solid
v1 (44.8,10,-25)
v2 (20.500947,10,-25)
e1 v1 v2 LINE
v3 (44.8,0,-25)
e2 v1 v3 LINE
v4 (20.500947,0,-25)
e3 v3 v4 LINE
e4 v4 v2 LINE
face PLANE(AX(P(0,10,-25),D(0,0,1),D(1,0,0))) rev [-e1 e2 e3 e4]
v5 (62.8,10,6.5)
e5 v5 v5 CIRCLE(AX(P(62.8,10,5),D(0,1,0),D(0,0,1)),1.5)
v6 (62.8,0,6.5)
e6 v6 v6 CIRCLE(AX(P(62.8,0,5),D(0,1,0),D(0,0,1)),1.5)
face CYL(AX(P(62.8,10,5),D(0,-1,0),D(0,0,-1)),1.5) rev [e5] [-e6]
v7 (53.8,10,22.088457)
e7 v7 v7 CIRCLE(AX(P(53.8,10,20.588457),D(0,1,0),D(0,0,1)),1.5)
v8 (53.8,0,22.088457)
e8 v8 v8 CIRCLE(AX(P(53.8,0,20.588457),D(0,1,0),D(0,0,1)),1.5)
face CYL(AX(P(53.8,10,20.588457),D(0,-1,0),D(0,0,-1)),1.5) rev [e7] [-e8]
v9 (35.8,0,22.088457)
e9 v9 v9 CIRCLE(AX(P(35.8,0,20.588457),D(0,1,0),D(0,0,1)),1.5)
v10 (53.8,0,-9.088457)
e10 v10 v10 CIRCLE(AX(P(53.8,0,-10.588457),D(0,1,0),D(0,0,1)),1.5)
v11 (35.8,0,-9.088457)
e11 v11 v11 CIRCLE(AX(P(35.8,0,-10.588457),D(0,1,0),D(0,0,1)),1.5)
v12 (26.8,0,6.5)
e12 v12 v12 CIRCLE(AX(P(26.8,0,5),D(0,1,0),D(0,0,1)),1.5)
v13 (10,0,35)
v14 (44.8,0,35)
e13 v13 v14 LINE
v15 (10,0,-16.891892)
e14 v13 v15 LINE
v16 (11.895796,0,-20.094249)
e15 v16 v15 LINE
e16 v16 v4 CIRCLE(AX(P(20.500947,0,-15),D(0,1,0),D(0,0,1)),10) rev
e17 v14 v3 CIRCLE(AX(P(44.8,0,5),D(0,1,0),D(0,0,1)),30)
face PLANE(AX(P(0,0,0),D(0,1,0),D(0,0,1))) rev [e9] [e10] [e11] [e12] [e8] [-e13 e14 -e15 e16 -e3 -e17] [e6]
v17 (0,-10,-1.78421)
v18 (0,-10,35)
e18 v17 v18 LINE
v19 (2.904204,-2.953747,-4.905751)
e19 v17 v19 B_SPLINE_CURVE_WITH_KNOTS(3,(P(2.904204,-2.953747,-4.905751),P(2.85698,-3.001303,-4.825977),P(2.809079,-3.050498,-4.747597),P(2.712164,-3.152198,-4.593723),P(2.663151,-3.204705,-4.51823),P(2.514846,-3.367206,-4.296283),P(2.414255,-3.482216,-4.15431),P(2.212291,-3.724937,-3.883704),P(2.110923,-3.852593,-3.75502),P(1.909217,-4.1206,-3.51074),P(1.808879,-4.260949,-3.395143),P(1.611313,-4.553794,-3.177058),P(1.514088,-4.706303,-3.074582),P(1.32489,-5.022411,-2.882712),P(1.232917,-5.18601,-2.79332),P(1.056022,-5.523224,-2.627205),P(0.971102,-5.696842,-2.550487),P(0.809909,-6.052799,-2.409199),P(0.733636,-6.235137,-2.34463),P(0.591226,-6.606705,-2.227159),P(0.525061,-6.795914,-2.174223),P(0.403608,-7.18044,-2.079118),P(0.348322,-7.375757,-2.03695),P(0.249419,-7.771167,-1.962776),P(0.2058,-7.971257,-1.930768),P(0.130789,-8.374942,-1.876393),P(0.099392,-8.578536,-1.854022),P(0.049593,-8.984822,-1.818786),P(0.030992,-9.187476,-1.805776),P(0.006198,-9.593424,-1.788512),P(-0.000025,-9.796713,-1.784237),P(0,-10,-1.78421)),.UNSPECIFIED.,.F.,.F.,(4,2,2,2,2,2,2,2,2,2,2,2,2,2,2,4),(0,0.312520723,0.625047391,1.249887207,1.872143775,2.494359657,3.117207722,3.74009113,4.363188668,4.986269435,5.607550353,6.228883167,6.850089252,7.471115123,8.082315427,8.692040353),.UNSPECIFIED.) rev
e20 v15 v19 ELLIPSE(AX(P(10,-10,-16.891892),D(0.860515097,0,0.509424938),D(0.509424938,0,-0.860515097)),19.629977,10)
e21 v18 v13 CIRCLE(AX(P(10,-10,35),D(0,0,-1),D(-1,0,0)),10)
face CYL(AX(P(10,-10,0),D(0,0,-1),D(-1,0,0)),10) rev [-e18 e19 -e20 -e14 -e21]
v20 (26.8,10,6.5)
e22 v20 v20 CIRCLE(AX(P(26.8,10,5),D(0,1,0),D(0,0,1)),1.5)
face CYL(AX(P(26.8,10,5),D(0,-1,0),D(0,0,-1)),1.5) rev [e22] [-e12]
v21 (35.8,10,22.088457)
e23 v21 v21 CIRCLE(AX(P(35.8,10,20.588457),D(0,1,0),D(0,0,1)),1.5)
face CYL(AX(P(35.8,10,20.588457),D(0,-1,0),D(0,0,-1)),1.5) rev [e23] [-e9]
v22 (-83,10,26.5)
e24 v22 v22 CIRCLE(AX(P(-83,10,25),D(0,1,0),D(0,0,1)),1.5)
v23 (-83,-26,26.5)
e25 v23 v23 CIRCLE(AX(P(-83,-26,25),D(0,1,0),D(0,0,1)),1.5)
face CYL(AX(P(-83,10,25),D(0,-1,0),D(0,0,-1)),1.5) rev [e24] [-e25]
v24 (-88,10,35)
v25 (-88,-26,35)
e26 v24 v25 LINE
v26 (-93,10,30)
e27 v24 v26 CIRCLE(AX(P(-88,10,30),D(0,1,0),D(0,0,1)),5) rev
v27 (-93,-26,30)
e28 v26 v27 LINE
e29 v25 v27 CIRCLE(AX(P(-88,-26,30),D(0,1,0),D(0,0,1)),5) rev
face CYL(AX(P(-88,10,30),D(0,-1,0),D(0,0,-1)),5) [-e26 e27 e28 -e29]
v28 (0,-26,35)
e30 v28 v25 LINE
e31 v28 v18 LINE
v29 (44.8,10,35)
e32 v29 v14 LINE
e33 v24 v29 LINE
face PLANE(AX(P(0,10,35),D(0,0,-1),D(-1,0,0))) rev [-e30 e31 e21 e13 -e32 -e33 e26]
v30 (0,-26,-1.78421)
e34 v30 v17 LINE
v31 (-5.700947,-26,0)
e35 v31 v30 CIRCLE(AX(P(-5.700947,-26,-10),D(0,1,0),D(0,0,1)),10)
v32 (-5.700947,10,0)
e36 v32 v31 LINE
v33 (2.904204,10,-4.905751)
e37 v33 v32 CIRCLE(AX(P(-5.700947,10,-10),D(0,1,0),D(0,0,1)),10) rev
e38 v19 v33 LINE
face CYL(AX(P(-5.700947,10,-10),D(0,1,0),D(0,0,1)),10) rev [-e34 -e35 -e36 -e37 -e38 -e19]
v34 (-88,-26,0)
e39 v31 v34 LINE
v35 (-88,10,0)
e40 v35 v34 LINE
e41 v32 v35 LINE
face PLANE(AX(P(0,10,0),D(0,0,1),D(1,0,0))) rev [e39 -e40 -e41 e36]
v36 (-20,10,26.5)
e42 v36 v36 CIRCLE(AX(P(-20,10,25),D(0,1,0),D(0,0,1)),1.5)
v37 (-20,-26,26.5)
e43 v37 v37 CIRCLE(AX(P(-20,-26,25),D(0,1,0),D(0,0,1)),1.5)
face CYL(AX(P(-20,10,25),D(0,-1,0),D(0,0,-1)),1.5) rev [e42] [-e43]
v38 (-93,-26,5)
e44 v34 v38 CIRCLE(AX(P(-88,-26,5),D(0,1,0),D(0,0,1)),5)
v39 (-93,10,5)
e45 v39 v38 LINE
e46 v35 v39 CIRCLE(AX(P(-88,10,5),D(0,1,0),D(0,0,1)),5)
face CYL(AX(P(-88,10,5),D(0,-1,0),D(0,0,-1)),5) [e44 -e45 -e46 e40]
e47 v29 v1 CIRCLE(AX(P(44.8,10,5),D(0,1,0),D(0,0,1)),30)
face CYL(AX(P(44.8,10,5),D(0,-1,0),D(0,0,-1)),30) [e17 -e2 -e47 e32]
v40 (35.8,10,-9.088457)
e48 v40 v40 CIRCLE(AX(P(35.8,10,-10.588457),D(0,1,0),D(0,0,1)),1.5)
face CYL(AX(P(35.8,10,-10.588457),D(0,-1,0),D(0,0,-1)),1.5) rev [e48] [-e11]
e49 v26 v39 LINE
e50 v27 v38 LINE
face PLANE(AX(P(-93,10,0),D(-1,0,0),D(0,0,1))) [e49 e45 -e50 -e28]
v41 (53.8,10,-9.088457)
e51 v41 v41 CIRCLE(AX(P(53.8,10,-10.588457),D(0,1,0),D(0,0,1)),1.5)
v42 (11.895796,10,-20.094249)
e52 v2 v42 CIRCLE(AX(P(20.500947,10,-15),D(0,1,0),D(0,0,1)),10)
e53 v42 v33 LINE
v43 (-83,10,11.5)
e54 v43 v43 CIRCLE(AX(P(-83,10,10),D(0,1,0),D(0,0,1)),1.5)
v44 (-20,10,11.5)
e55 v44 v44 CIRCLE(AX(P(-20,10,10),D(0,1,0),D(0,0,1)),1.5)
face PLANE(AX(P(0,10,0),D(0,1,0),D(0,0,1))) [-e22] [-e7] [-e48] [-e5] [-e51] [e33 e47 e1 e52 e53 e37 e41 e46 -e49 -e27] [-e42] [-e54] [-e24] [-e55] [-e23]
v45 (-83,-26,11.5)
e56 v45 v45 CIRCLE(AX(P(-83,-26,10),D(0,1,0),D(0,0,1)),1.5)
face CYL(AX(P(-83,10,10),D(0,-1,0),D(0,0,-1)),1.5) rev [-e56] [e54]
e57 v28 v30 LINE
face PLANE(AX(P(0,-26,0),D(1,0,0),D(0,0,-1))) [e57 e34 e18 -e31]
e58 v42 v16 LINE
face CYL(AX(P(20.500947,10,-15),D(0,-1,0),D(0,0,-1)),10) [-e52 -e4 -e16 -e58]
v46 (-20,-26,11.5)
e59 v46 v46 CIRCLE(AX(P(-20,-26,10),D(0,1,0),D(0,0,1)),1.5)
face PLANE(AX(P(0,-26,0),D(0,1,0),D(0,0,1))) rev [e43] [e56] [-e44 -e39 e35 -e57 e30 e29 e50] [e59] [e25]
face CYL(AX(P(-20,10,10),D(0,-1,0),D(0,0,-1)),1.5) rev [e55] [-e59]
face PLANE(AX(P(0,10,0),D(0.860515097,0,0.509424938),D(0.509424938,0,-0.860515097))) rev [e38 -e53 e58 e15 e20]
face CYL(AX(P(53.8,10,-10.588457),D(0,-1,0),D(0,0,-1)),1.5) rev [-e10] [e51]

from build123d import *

# Parameters (mm, degrees)
SKETCH1_R           = 1.5
BOSS_EXTRUDE2_DEPTH = 10
BOSS_EXTRUDE3_START = -26
SKETCH1_3_R         = 1.5
BOSS_EXTRUDE3_DEPTH = 26
FILLET1_R           = 10


with BuildPart() as part:
    # Sketch1 → Boss-Extrude2 (new body)
    # profile 1 of 2: a face of its own
    with BuildSketch(Plane(origin=(0, 0, 0), x_dir=(-1, 0, 0), z_dir=(0, 1, 0))):
        with BuildLine():
            Line((0, 35), (-44.8, 35))
            ThreePointArc((-44.8, 35), (-74.8, 5), (-44.8, -25))
            Line((-44.8, -25), (-14.8, -25))
            Line((-14.8, -25), (0, 0))
            Line((0, 0), (0, 35))
        make_face()
        with Locations(Location((-53.8, -10.588457268, 0), (0, 0, 90))):
            Circle(SKETCH1_R, mode=Mode.SUBTRACT)
        with Locations(Location((-35.8, -10.588457268, 0), (0, 0, 90))):
            Circle(SKETCH1_R, mode=Mode.SUBTRACT)
        with Locations(Location((-26.8, 5, 0), (0, 0, 90))):
            Circle(SKETCH1_R, mode=Mode.SUBTRACT)
        with Locations(Location((-35.8, 20.588457268, 0), (0, 0, 90))):
            Circle(SKETCH1_R, mode=Mode.SUBTRACT)
        with Locations(Location((-53.8, 20.588457268, 0), (0, 0, 90))):
            Circle(SKETCH1_R, mode=Mode.SUBTRACT)
        with Locations(Location((-62.8, 5, 0), (0, 0, 90))):
            Circle(SKETCH1_R, mode=Mode.SUBTRACT)
    # profile 2 of 2: a face of its own
    with BuildSketch(Plane(origin=(0, 0, 0), x_dir=(-1, 0, 0), z_dir=(0, 1, 0))):
        with BuildLine():
            ThreePointArc((88, 35), (91.535533906, 33.535533906), (93, 30))
            Line((93, 30), (93, 5))
            ThreePointArc((93, 5), (91.535533906, 1.464466094), (88, 0))
            Line((88, 0), (0, 0))
            Line((0, 0), (0, 35))
            Line((0, 35), (88, 35))
        make_face()
        with Locations(Location((20, 10, 0), (0, 0, 90))):
            Circle(SKETCH1_R, mode=Mode.SUBTRACT)
        with Locations(Location((83, 10, 0), (0, 0, 90))):
            Circle(SKETCH1_R, mode=Mode.SUBTRACT)
        with Locations(Location((83, 25, 0), (0, 0, 90))):
            Circle(SKETCH1_R, mode=Mode.SUBTRACT)
        with Locations(Location((20, 25, 0), (0, 0, 90))):
            Circle(SKETCH1_R, mode=Mode.SUBTRACT)
    extrude(amount=BOSS_EXTRUDE2_DEPTH)

    # Sketch1<3> → Boss-Extrude3 (add)
    with BuildSketch(Plane(origin=(0, 0, 0), x_dir=(-1, 0, 0), z_dir=(0, 1, 0)).offset(BOSS_EXTRUDE3_START)):
        with BuildLine():
            ThreePointArc((88, 35), (91.535533906, 33.535533906), (93, 30))
            Line((93, 30), (93, 5))
            ThreePointArc((93, 5), (91.535533906, 1.464466094), (88, 0))
            Line((88, 0), (0, 0))
            Line((0, 0), (0, 35))
            Line((0, 35), (88, 35))
        make_face()
        with Locations(Location((20, 10, 0), (0, 0, 90))):
            Circle(SKETCH1_3_R, mode=Mode.SUBTRACT)
        with Locations(Location((83, 10, 0), (0, 0, 90))):
            Circle(SKETCH1_3_R, mode=Mode.SUBTRACT)
        with Locations(Location((83, 25, 0), (0, 0, 90))):
            Circle(SKETCH1_3_R, mode=Mode.SUBTRACT)
        with Locations(Location((20, 25, 0), (0, 0, 90))):
            Circle(SKETCH1_3_R, mode=Mode.SUBTRACT)
    extrude(amount=BOSS_EXTRUDE3_DEPTH)

    # Fillet1
    # the kernel refuses this fillet: 10 mm, written as the material it adds along each edge
    with BuildSketch(Plane(origin=(0, 0, -60), x_dir=(0, -1, 0), z_dir=(0, 0, 1))) as fillet1_piece_1_section:
        with BuildLine():
            CenterArc((FILLET1_R, FILLET1_R), FILLET1_R, 180, 90)
            Line((0, FILLET1_R), (-FILLET1_R * 0.02, FILLET1_R))
            Line((-FILLET1_R * 0.02, FILLET1_R), (-FILLET1_R * 0.02, -FILLET1_R * 0.02))
            Line((-FILLET1_R * 0.02, -FILLET1_R * 0.02), (FILLET1_R, -FILLET1_R * 0.02))
            Line((FILLET1_R, -FILLET1_R * 0.02), (FILLET1_R, 0))
        make_face()
    fillet1_piece_1 = extrude(amount=95, mode=Mode.PRIVATE)
    fillet1_piece_1 = split(fillet1_piece_1, bisect_by=Plane(origin=(4.301180518, -1.064725153, 0), z_dir=(0, 0, -1)), keep=Keep.TOP, mode=Mode.PRIVATE)
    fillet1_piece_1 = split(fillet1_piece_1, bisect_by=Plane(origin=(2.708698038, -1.064725153, -4.575503443), z_dir=(0.8605150974154716, 0, 0.509424937669959)), keep=Keep.TOP, mode=Mode.PRIVATE)
    add(fillet1_piece_1)
    with BuildSketch(Plane(origin=(0, 0, 0), x_dir=(0, -1, 0), z_dir=(0, 0, 1))) as fillet1_piece_2_section:
        with BuildLine():
            CenterArc((FILLET1_R, FILLET1_R), FILLET1_R, 180, 90)
            Line((0, FILLET1_R), (-FILLET1_R * 0.02, FILLET1_R))
            Line((-FILLET1_R * 0.02, FILLET1_R), (-FILLET1_R * 0.02, -FILLET1_R * 0.02))
            Line((-FILLET1_R * 0.02, -FILLET1_R * 0.02), (FILLET1_R, -FILLET1_R * 0.02))
            Line((FILLET1_R, -FILLET1_R * 0.02), (FILLET1_R, 0))
        make_face()
    fillet1_piece_2 = extrude(amount=35, mode=Mode.PRIVATE)
    fillet1_piece_2 = split(fillet1_piece_2, bisect_by=Plane(origin=(-7.086614588, -2.262932977, 11.97063275), z_dir=(0.8605150974154716, 0, 0.509424937669959)), keep=Keep.TOP, mode=Mode.PRIVATE)
    add(fillet1_piece_2)
    with BuildSketch(Plane(origin=(0, 0, 0), x_dir=(0, -1, 0), z_dir=(0, 0, 1))) as fillet1_piece_3_section:
        with BuildLine():
            CenterArc((FILLET1_R, FILLET1_R), FILLET1_R, 180, 90)
            Line((0, FILLET1_R), (-FILLET1_R * 0.02, FILLET1_R))
            Line((-FILLET1_R * 0.02, FILLET1_R), (-FILLET1_R * 0.02, -FILLET1_R * 0.02))
            Line((-FILLET1_R * 0.02, -FILLET1_R * 0.02), (FILLET1_R, -FILLET1_R * 0.02))
            Line((FILLET1_R, -FILLET1_R * 0.02), (FILLET1_R, 0))
        make_face()
    fillet1_piece_3 = extrude(amount=35, mode=Mode.PRIVATE)
    fillet1_piece_3 = split(fillet1_piece_3, bisect_by=Plane(origin=(-0.083967584, -4.9, 0.141837136), z_dir=(-0.8605150974154716, 0, -0.509424937669959)), keep=Keep.TOP, mode=Mode.PRIVATE)
    add(fillet1_piece_3)
    with BuildSketch(Plane(origin=(0, -34.205679631, 0), x_dir=(-1, 0, 0), z_dir=(0, 1, 0))) as fillet1_piece_4_section:
        with BuildLine():
            CenterArc((FILLET1_R * 0.570094660516, -FILLET1_R), FILLET1_R, 90, 59.374467281)
            Line((-FILLET1_R * 0.290420436899, -FILLET1_R * 0.49057506233), (-FILLET1_R * 0.307630738848, -FILLET1_R * 0.480386563577))
            Line((-FILLET1_R * 0.307630738848, -FILLET1_R * 0.480386563577), (-FILLET1_R * 0.0114018932103, FILLET1_R * 0.02))
            Line((-FILLET1_R * 0.0114018932103, FILLET1_R * 0.02), (FILLET1_R * 0.570094660516, FILLET1_R * 0.02))
            Line((FILLET1_R * 0.570094660516, FILLET1_R * 0.02), (FILLET1_R * 0.570094660516, 0))
        make_face()
    fillet1_piece_4 = extrude(amount=44.205679631, mode=Mode.PRIVATE)
    fillet1_piece_4 = split(fillet1_piece_4, bisect_by=Plane(origin=(0, -13, -0.363733484), z_dir=(-1, 0, 0)), keep=Keep.TOP, mode=Mode.PRIVATE)
    fillet1_piece_4 = split(fillet1_piece_4, bisect_by=Plane(origin=(-1.77482193, -26, -0.363733484), z_dir=(0, 1, 0)), keep=Keep.TOP, mode=Mode.PRIVATE)
    fillet1_piece_4 = split(fillet1_piece_4, bisect_by=Plane(origin=(-1.77482193, 0, -0.363733484), z_dir=(0, -1, 0)), keep=Keep.TOP, mode=Mode.PRIVATE)
    add(fillet1_piece_4)
    with BuildSketch(Plane(origin=(0, 0, 0), x_dir=(-1, 0, 0), z_dir=(0, 1, 0))) as fillet1_piece_5_section:
        with BuildLine():
            CenterArc((FILLET1_R * 0.570094660516, -FILLET1_R), FILLET1_R, 90, 59.374467281)
            Line((-FILLET1_R * 0.290420436899, -FILLET1_R * 0.49057506233), (-FILLET1_R * 0.307630738848, -FILLET1_R * 0.480386563577))
            Line((-FILLET1_R * 0.307630738848, -FILLET1_R * 0.480386563577), (-FILLET1_R * 0.0114018932103, FILLET1_R * 0.02))
            Line((-FILLET1_R * 0.0114018932103, FILLET1_R * 0.02), (FILLET1_R * 0.570094660516, FILLET1_R * 0.02))
            Line((FILLET1_R * 0.570094660516, FILLET1_R * 0.02), (FILLET1_R * 0.570094660516, 0))
        make_face()
    fillet1_piece_5 = extrude(amount=10, mode=Mode.PRIVATE)
    fillet1_piece_5 = split(fillet1_piece_5, bisect_by=Plane(origin=(0, 5, -0.363733484), z_dir=(-1, 0, 0)), keep=Keep.TOP, mode=Mode.PRIVATE)
    add(fillet1_piece_5)
    with BuildSketch(Plane(origin=(0, 0, 0), x_dir=(-1, 0, 0), z_dir=(0, 1, 0))) as fillet1_piece_6_section:
        with BuildLine():
            CenterArc((FILLET1_R * 0.570094660516, -FILLET1_R), FILLET1_R, 90, 59.374467281)
            Line((-FILLET1_R * 0.290420436899, -FILLET1_R * 0.49057506233), (-FILLET1_R * 0.307630738848, -FILLET1_R * 0.480386563577))
            Line((-FILLET1_R * 0.307630738848, -FILLET1_R * 0.480386563577), (-FILLET1_R * 0.0114018932103, FILLET1_R * 0.02))
            Line((-FILLET1_R * 0.0114018932103, FILLET1_R * 0.02), (FILLET1_R * 0.570094660516, FILLET1_R * 0.02))
            Line((FILLET1_R * 0.570094660516, FILLET1_R * 0.02), (FILLET1_R * 0.570094660516, 0))
        make_face()
    fillet1_piece_6 = extrude(amount=10, mode=Mode.PRIVATE)
    fillet1_piece_6 = split(fillet1_piece_6, bisect_by=Plane(origin=(0, 5, -2.053594733), z_dir=(1, 0, 0)), keep=Keep.TOP, mode=Mode.PRIVATE)
    add(fillet1_piece_6)
    with BuildSketch(Plane(origin=(0, -34.205679631, 0), x_dir=(-1, 0, 0), z_dir=(0, 1, 0))) as fillet1_piece_7a_section:
        with BuildLine():
            CenterArc((FILLET1_R * 0.570094660516, -FILLET1_R), FILLET1_R, 90, 59.374467281)
            Line((-FILLET1_R * 0.290420436899, -FILLET1_R * 0.49057506233), (-FILLET1_R * 0.307630738848, -FILLET1_R * 0.480386563577))
            Line((-FILLET1_R * 0.307630738848, -FILLET1_R * 0.480386563577), (-FILLET1_R * 0.0114018932103, FILLET1_R * 0.02))
            Line((-FILLET1_R * 0.0114018932103, FILLET1_R * 0.02), (FILLET1_R * 0.570094660516, FILLET1_R * 0.02))
            Line((FILLET1_R * 0.570094660516, FILLET1_R * 0.02), (FILLET1_R * 0.570094660516, 0))
        make_face()
    fillet1_piece_7a = extrude(amount=44.205679631, mode=Mode.PRIVATE)
    fillet1_piece_7a = split(fillet1_piece_7a, bisect_by=Plane(origin=(0, -13, -2.053594733), z_dir=(1, 0, 0)), keep=Keep.TOP, mode=Mode.PRIVATE)
    fillet1_piece_7a = split(fillet1_piece_7a, bisect_by=Plane(origin=(1.054652956, -26, -2.053594733), z_dir=(0, 1, 0)), keep=Keep.TOP, mode=Mode.PRIVATE)
    fillet1_piece_7a = split(fillet1_piece_7a, bisect_by=Plane(origin=(1.054652956, 0, -2.053594733), z_dir=(0, -1, 0)), keep=Keep.TOP, mode=Mode.PRIVATE)
    with BuildSketch(Plane(origin=(0, 0, -60), x_dir=(0, -1, 0), z_dir=(0, 0, 1))) as fillet1_piece_7b_section:
        with BuildLine():
            CenterArc((FILLET1_R, FILLET1_R), FILLET1_R, 180, 90)
            Line((0, FILLET1_R), (-FILLET1_R * 0.02, FILLET1_R))
            Line((-FILLET1_R * 0.02, FILLET1_R), (-FILLET1_R * 0.02, -FILLET1_R * 0.02))
            Line((-FILLET1_R * 0.02, -FILLET1_R * 0.02), (FILLET1_R, -FILLET1_R * 0.02))
            Line((FILLET1_R, -FILLET1_R * 0.02), (FILLET1_R, 0))
        make_face()
    fillet1_piece_7b = extrude(amount=95, mode=Mode.PRIVATE)
    fillet1_piece_7b = split(fillet1_piece_7b, bisect_by=Plane(origin=(2.124740403, -2.345898291, 0), z_dir=(0, 0, -1)), keep=Keep.TOP, mode=Mode.PRIVATE)
    fillet1_piece_7b = split(fillet1_piece_7b, bisect_by=Plane(origin=(14.492269712, -2.345898291, -24.480185325), z_dir=(-0.8605150974154716, 0, -0.509424937669959)), keep=Keep.TOP, mode=Mode.PRIVATE)
    fillet1_piece_7 = fillet1_piece_7a & fillet1_piece_7b
    add(fillet1_piece_7)
    # the kernel refuses this fillet: 10 mm, written as the material it takes off along each edge
    with BuildSketch(Plane(origin=(14.8, -34.205679631, -25), x_dir=(-0.5094249376699589, 0, 0.8605150974154715), z_dir=(0, 1, 0))) as fillet1_2_piece_1:
        with BuildLine():
            CenterArc((FILLET1_R * 0.570094660516, FILLET1_R), FILLET1_R, 210.625532719, 59.374467281)
            Line((-FILLET1_R * 0.290420436899, FILLET1_R * 0.49057506233), (-FILLET1_R * 0.307630738848, FILLET1_R * 0.480386563577))
            Line((-FILLET1_R * 0.307630738848, FILLET1_R * 0.480386563577), (-FILLET1_R * 0.0114018932103, -FILLET1_R * 0.02))
            Line((-FILLET1_R * 0.0114018932103, -FILLET1_R * 0.02), (FILLET1_R * 0.570094660516, -FILLET1_R * 0.02))
            Line((FILLET1_R * 0.570094660516, -FILLET1_R * 0.02), (FILLET1_R * 0.570094660516, 0))
        make_face()
    extrude(amount=78.411359262, mode=Mode.SUBTRACT)


solid = part.part
